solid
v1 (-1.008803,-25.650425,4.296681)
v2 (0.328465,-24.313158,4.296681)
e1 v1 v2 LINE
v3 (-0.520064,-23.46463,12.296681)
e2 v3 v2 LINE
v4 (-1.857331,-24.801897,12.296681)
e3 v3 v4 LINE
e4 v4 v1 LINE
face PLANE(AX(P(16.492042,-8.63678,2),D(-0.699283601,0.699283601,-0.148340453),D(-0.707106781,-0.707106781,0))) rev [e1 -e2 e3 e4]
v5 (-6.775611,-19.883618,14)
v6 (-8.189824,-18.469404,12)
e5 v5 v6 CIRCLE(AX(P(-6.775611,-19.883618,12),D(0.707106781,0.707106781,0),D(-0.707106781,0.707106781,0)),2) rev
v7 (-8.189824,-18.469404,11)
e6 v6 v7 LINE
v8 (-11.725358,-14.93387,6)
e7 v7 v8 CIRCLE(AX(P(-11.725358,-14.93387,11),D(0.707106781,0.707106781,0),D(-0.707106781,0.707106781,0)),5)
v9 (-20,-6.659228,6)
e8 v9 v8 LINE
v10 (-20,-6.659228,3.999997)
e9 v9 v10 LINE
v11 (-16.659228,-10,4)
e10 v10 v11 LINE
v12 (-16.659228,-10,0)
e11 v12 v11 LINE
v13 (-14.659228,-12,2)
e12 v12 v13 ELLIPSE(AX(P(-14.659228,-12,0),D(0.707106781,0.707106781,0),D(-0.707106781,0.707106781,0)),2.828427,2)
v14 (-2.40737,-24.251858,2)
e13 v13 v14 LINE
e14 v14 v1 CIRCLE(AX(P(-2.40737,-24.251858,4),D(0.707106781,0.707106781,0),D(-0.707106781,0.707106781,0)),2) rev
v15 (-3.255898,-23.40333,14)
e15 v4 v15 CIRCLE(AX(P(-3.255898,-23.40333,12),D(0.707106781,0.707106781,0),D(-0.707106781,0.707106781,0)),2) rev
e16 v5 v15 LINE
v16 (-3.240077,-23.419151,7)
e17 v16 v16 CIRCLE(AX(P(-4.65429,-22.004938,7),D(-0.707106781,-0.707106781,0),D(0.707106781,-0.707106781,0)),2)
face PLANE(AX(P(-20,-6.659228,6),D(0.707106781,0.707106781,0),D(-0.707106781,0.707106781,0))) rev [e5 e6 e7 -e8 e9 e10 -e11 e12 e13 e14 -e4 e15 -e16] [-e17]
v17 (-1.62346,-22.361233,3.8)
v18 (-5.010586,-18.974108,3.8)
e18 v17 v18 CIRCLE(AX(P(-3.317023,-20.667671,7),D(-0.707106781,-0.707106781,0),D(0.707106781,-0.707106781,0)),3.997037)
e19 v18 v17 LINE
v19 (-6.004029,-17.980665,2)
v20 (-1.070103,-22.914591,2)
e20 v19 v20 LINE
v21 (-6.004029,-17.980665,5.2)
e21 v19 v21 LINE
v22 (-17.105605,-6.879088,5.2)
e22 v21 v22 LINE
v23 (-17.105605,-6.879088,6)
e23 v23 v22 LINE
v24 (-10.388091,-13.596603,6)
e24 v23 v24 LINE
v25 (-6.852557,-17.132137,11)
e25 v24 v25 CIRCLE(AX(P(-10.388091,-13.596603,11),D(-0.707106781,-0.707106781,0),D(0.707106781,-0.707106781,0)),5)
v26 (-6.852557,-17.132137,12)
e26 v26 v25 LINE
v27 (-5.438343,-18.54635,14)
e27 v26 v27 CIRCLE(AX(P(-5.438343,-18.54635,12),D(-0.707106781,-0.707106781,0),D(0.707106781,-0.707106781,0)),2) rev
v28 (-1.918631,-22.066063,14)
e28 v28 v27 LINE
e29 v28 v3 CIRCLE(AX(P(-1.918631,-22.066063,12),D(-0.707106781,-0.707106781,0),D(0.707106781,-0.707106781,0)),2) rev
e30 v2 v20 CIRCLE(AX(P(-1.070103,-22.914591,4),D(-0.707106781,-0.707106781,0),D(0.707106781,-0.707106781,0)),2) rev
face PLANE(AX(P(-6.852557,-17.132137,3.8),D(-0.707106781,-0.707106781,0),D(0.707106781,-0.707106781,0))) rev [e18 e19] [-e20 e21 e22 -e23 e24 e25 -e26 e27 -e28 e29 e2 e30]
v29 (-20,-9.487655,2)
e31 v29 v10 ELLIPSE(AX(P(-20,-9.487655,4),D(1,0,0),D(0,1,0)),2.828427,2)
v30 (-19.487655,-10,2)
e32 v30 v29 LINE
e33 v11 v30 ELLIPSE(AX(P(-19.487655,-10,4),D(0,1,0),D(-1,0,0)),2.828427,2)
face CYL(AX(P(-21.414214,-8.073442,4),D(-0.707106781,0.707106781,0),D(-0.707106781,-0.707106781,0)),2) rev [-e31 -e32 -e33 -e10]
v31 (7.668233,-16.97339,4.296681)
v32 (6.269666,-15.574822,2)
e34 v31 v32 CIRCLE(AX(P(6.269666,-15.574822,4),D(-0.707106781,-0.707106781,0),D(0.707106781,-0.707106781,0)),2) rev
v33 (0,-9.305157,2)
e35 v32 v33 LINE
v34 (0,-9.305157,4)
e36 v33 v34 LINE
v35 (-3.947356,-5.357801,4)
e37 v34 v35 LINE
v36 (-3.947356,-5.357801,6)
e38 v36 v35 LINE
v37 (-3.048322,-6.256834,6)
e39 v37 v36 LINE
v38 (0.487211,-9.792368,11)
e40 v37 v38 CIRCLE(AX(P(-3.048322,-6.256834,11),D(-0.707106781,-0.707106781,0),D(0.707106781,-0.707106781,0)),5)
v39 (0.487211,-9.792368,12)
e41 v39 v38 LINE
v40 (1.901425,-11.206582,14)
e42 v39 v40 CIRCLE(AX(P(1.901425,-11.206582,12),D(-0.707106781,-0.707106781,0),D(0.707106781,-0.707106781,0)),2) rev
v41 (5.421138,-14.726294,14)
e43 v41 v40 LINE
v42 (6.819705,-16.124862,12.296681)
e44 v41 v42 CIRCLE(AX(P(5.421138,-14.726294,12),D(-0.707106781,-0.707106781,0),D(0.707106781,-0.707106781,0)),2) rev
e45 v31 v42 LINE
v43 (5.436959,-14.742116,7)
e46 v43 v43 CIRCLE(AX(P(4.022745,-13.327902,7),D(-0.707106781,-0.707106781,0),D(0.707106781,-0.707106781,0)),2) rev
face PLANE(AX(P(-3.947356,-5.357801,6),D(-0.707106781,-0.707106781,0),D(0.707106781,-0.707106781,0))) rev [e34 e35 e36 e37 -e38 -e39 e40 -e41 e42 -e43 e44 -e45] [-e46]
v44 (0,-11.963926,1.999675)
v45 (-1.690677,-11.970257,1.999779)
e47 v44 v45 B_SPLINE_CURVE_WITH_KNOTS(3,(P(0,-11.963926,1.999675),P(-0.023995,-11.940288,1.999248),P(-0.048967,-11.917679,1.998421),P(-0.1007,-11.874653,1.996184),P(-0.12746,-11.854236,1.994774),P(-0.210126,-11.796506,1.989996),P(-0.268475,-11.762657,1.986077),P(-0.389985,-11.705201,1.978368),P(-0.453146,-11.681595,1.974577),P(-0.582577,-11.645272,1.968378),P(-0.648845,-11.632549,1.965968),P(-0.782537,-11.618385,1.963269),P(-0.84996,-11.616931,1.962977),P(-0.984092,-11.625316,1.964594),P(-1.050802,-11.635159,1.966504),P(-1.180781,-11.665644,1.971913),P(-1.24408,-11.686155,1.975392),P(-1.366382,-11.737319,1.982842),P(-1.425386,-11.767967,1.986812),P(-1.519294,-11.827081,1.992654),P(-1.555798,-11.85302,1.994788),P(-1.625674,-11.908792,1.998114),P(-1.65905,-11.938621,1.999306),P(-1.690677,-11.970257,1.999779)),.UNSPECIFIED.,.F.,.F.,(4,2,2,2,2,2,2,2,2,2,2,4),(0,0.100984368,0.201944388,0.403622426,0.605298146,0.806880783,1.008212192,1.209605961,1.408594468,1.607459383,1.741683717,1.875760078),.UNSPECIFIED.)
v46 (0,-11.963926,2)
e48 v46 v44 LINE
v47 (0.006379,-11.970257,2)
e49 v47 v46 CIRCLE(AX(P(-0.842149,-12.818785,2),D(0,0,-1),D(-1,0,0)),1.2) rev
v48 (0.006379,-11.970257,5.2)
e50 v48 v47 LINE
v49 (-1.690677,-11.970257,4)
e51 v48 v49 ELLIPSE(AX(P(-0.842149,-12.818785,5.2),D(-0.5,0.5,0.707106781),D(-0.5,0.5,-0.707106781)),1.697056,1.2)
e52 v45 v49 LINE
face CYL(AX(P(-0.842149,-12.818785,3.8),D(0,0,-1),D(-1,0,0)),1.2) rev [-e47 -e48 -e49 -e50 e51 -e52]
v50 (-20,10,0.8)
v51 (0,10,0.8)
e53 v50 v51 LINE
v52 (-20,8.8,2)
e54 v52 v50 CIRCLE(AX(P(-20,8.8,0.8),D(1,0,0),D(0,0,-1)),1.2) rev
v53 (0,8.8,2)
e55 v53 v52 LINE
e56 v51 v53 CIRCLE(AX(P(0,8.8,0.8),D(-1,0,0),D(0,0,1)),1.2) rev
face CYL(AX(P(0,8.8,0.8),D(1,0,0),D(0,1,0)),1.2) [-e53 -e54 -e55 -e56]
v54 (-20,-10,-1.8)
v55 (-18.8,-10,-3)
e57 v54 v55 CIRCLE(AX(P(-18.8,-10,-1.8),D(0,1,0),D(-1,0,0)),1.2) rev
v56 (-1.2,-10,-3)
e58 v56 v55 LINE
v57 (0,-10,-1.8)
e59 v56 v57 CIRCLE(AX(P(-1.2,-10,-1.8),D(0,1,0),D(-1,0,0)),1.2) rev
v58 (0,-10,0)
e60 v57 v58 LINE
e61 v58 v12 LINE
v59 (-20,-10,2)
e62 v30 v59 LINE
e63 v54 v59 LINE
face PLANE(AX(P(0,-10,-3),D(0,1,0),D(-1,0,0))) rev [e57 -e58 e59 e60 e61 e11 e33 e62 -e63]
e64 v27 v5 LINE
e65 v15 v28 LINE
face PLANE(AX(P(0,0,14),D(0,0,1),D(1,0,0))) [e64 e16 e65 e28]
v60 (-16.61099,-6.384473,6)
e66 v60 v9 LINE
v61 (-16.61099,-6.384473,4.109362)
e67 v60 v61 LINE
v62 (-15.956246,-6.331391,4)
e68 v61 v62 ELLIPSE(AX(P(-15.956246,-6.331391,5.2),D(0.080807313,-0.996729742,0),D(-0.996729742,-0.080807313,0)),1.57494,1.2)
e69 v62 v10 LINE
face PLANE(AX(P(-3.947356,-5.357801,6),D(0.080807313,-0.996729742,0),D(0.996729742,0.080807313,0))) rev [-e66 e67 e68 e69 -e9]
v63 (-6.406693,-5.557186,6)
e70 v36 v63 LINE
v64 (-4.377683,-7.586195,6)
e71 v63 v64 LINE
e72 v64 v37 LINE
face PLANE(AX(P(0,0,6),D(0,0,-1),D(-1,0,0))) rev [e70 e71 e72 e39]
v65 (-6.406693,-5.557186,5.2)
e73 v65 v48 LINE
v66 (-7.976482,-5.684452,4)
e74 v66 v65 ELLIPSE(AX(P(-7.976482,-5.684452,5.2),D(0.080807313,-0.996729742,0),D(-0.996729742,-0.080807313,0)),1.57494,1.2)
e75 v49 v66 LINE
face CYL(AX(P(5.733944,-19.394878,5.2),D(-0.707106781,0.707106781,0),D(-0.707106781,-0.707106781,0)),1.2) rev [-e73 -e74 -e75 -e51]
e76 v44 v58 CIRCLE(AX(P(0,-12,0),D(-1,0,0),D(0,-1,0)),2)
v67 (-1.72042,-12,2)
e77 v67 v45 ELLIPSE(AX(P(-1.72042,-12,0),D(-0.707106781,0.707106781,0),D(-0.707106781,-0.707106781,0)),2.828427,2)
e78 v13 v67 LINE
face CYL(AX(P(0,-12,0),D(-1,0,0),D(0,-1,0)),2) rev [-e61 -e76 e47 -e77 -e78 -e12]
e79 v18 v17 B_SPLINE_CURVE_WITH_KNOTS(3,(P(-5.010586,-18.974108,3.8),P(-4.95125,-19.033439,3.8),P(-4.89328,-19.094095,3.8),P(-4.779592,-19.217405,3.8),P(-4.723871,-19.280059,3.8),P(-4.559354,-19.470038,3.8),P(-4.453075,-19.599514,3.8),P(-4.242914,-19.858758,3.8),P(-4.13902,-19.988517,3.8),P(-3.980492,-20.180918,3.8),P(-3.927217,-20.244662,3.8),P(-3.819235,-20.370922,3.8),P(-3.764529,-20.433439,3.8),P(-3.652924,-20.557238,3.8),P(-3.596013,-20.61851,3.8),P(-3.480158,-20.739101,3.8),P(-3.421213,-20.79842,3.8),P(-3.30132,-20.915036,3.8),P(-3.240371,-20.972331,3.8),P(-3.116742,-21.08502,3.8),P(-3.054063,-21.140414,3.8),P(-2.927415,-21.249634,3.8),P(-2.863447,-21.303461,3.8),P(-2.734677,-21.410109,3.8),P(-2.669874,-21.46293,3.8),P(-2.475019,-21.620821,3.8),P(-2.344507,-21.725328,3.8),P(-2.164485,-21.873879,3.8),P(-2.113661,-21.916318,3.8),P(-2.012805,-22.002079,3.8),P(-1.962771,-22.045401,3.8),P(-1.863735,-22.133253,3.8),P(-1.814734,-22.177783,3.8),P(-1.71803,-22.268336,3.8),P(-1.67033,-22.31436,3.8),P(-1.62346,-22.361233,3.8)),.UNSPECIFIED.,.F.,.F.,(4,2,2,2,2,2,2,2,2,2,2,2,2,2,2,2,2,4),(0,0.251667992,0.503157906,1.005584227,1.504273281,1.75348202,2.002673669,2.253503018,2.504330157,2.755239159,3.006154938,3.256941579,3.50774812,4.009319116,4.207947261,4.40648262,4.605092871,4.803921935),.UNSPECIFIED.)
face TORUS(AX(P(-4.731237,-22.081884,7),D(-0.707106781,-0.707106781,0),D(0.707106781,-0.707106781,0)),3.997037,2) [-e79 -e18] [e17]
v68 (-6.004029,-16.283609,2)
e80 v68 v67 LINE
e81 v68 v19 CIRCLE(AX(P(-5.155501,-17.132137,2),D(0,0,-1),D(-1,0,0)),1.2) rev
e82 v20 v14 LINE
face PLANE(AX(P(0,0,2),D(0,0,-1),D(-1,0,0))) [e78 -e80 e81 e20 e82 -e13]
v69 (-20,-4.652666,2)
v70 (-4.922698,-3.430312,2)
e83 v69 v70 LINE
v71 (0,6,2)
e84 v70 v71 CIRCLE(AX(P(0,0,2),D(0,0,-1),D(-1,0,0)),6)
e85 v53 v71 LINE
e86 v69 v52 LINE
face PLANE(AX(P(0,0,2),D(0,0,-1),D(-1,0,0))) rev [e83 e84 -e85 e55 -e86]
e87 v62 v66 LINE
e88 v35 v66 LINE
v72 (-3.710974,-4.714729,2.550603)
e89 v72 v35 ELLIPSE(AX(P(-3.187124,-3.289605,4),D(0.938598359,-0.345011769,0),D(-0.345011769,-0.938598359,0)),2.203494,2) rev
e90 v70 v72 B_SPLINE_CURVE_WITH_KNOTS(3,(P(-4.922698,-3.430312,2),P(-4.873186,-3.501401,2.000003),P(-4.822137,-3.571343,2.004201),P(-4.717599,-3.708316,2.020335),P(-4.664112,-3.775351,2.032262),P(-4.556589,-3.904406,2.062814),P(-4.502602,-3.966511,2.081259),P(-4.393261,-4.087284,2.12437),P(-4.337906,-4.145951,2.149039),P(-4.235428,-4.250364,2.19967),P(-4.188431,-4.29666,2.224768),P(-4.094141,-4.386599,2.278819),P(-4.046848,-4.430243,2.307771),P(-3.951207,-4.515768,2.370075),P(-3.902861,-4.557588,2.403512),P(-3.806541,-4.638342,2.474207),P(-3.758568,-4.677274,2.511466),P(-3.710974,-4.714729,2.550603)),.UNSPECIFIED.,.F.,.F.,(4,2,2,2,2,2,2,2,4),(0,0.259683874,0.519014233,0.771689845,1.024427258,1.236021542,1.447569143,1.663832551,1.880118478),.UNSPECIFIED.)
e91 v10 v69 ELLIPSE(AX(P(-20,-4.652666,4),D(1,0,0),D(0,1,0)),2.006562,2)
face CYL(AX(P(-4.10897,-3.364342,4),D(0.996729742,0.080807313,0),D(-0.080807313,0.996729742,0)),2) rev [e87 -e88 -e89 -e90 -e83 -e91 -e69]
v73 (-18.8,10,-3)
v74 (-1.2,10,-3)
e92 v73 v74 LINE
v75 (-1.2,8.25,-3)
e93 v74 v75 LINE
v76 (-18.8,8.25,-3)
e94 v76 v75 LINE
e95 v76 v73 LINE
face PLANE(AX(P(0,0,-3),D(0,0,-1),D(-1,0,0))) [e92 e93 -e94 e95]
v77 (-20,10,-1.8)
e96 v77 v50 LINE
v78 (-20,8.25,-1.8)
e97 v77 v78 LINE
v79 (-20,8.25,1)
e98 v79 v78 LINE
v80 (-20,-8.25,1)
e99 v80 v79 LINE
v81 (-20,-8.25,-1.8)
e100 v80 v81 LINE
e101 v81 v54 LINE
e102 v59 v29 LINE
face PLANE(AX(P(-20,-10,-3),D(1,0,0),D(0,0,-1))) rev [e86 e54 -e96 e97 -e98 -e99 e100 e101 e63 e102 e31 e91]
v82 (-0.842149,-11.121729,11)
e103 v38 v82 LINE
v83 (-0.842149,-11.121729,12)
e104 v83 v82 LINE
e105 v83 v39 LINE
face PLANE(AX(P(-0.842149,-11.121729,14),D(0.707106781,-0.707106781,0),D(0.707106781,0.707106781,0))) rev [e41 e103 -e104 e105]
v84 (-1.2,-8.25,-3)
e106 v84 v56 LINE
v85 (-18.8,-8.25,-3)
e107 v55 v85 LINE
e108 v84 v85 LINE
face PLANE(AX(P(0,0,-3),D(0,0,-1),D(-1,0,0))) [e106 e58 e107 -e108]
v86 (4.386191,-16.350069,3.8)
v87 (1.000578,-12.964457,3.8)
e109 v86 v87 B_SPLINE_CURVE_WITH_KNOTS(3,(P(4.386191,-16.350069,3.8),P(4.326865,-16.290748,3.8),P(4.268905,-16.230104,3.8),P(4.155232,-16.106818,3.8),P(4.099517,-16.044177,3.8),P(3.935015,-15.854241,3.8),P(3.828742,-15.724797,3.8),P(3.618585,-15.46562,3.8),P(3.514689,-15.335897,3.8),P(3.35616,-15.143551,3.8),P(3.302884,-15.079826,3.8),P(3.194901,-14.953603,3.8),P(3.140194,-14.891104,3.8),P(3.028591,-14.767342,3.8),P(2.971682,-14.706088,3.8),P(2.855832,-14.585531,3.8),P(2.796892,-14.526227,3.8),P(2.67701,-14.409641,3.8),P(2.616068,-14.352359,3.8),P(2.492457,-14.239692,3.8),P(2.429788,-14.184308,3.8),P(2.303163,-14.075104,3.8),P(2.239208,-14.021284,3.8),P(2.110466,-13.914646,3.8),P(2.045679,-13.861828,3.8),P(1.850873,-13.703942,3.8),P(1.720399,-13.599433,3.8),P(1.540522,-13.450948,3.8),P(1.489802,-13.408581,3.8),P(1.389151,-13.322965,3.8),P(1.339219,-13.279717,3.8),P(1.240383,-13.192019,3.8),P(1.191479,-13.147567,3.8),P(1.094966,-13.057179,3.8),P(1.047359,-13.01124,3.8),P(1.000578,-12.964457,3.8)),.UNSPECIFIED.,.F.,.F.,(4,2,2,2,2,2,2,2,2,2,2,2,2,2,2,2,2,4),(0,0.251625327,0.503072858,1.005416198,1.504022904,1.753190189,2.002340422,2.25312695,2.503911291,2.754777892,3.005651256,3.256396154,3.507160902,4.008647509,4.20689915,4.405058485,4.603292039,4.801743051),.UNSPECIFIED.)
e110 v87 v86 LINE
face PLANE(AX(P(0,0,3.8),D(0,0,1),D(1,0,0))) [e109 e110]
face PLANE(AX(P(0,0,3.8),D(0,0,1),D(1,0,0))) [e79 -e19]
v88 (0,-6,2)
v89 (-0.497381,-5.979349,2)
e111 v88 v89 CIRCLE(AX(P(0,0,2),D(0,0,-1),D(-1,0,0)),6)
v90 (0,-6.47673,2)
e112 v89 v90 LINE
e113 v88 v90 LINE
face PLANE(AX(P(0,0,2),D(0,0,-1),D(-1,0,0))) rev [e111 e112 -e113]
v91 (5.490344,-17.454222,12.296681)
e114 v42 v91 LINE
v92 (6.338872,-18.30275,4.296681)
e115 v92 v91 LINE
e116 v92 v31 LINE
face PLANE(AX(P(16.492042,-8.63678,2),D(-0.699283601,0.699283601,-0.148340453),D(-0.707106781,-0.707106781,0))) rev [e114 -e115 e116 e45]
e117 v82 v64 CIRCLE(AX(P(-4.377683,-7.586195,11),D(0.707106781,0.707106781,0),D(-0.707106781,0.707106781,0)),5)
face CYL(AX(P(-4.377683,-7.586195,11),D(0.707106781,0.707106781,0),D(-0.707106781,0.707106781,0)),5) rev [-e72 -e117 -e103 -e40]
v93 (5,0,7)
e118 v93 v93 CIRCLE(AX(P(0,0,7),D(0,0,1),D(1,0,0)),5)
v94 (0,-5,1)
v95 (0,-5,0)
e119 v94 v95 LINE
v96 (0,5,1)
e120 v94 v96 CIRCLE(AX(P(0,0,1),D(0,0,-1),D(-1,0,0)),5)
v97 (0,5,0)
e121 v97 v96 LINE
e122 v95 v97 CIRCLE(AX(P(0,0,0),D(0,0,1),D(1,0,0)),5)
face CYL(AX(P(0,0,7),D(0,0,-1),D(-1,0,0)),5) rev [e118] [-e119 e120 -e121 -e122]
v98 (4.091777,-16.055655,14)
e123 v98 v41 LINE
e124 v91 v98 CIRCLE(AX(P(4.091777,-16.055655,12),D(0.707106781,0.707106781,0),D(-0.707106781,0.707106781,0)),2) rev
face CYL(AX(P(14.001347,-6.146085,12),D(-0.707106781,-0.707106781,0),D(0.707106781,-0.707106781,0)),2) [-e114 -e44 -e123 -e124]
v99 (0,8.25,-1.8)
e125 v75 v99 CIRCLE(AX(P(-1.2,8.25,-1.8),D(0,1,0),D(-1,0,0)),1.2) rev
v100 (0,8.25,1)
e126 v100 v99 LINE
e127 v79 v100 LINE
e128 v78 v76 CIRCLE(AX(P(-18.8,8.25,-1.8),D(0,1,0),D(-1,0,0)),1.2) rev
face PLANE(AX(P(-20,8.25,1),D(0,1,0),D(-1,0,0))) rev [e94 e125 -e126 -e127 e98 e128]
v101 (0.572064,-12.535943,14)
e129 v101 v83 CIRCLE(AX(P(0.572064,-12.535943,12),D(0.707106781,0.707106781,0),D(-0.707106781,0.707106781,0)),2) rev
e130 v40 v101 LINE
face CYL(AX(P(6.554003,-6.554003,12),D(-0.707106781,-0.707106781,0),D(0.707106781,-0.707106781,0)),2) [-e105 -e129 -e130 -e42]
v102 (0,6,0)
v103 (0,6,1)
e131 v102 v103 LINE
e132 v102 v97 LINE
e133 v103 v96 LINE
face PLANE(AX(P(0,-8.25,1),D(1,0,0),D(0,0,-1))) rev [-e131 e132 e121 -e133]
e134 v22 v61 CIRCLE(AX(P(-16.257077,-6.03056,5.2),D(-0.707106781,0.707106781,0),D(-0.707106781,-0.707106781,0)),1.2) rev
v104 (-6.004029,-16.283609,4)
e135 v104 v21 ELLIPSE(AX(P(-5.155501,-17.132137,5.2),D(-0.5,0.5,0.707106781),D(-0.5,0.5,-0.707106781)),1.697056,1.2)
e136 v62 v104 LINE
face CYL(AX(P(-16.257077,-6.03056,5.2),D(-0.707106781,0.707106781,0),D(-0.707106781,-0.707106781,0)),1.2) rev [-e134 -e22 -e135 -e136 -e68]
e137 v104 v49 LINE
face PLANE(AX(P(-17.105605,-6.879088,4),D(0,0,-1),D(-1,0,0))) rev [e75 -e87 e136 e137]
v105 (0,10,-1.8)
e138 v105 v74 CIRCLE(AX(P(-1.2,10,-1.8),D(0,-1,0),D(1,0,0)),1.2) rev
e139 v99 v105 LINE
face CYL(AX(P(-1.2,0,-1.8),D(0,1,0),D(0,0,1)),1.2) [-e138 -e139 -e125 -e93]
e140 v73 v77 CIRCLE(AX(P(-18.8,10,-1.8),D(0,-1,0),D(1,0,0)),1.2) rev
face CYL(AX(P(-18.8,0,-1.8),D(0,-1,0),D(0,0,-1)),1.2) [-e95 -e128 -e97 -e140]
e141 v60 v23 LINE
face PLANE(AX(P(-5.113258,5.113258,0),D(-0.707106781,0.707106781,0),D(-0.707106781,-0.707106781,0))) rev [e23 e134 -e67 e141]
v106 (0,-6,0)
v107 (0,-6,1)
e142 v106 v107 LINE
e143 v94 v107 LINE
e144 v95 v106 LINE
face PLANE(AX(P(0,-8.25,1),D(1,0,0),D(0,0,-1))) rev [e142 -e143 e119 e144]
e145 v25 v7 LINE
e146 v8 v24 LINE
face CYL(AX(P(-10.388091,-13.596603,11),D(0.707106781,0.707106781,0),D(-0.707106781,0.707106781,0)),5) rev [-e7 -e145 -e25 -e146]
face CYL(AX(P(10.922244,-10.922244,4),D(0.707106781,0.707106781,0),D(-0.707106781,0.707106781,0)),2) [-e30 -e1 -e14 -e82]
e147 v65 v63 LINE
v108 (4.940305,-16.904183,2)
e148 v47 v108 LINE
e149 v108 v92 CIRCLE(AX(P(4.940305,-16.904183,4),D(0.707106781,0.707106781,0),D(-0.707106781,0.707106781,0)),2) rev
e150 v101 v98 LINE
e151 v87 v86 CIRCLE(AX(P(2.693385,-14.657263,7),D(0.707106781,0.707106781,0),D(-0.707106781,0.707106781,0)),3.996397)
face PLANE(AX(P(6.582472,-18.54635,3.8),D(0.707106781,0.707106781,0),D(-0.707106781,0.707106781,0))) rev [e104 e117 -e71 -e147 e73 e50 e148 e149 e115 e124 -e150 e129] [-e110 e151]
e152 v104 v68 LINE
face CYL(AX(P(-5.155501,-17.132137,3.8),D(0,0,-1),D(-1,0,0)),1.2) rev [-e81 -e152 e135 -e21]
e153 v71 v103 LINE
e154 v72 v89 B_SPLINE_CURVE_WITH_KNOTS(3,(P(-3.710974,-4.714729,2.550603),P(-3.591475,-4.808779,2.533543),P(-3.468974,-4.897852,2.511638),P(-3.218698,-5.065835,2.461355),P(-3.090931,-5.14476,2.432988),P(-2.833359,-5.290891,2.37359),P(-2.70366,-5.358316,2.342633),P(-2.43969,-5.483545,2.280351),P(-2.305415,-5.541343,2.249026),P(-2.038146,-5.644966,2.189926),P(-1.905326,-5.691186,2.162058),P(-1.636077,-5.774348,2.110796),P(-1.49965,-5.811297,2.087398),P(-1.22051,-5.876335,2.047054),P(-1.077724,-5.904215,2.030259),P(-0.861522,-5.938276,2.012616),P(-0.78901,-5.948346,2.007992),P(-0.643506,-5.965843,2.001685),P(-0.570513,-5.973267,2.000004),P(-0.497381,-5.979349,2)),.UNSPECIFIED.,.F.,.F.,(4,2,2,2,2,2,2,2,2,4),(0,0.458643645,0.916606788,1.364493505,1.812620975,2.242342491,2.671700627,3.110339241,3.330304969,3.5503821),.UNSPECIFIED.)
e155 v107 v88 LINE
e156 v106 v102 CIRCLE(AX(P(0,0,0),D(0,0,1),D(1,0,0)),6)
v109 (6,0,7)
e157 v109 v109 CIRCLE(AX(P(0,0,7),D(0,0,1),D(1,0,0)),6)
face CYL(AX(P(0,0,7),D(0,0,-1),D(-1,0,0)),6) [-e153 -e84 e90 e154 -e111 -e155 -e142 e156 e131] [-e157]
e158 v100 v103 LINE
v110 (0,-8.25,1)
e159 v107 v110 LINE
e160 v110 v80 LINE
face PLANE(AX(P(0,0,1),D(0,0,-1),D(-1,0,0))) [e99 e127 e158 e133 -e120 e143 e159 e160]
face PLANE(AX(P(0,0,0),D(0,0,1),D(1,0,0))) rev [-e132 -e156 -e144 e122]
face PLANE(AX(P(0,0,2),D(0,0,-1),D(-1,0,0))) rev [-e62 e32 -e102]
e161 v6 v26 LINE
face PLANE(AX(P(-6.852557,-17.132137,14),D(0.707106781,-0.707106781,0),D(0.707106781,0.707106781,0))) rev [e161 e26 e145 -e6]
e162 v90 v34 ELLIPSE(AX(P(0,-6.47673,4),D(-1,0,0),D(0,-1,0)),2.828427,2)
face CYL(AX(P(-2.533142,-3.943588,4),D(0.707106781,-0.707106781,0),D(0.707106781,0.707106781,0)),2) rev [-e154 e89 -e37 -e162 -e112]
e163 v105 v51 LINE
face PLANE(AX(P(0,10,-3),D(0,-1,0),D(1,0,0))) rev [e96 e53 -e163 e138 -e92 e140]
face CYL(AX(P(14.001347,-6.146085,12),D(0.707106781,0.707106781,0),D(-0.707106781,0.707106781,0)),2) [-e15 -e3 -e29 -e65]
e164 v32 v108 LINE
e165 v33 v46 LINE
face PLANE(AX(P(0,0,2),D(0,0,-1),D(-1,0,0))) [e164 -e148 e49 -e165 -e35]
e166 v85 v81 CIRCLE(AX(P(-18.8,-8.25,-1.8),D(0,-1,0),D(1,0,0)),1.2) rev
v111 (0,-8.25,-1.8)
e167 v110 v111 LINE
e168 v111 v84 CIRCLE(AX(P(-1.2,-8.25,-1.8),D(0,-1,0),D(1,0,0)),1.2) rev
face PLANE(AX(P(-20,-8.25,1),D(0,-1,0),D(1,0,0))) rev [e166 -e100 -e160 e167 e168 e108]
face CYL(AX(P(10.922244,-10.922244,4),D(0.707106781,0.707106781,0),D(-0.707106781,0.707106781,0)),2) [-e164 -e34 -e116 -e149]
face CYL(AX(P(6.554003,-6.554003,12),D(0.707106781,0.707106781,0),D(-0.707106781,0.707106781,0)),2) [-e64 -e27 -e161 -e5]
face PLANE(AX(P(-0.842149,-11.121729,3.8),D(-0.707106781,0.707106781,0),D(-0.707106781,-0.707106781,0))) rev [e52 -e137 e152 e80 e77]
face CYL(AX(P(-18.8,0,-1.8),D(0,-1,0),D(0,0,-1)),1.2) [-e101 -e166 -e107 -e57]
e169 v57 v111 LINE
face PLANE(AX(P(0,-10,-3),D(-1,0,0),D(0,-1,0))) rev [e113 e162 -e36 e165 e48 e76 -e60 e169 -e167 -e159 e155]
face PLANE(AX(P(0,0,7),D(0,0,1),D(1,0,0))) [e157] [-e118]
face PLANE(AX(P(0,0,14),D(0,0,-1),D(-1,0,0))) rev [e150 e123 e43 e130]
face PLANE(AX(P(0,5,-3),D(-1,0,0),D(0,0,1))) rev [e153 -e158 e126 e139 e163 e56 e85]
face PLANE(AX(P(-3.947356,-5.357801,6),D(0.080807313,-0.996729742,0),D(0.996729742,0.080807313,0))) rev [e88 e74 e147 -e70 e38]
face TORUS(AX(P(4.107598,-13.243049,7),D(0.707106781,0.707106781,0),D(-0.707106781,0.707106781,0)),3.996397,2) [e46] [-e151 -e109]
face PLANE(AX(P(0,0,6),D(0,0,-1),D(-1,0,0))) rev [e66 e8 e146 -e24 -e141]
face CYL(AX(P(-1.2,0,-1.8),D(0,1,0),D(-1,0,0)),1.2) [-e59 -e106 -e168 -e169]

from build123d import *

# Parameters (mm, degrees)
CROQUIS1_R                   = 6
CROQUIS1_R_2                 = 5
SALIENTE_EXTRUIR1_DEPTH      = 7
SALIENTE_EXTRUIR2_DEPTH      = 3
SALIENTE_EXTRUIR2_DEPTH_BACK = 2
CROQUIS4_W                   = 20
CROQUIS4_H                   = 16.5
CORTAR_EXTRUIR1_DEPTH        = 4
SALIENTE_EXTRUIR7_DEPTH      = 4
CORTAR_EXTRUIR4_DEPTH        = 4
CORTAR_EXTRUIR5_DEPTH        = 2.2
SALIENTE_EXTRUIR9_DEPTH      = 8
CORTAR_EXTRUIR6_REACH        = 36.518
CROQUIS13_R                  = 2
REDONDEO1_R                  = 2
CROQUIS14_W                  = 1.8
CROQUIS14_H                  = 8.5
CORTAR_EXTRUIR7_DEPTH        = 10.5
CROQUIS15_W                  = 2
CROQUIS15_H                  = 8.5
CORTAR_EXTRUIR8_DEPTH        = 14.5
REDONDEO2_R                  = 2
REDONDEO3_R                  = 2
REDONDEO4_R                  = 5
CORTAR_EXTRUIR9_REACH        = 36.518
REDONDEO5_R                  = 2
REDONDEO6_R                  = 1.2
REDONDEO7_R                  = 1.2


with BuildPart() as part:
    # Croquis1 → Saliente-Extruir1 (new body)
    with BuildSketch(Plane.XY):
        Circle(CROQUIS1_R)
        Circle(CROQUIS1_R_2, mode=Mode.SUBTRACT)
    extrude(amount=SALIENTE_EXTRUIR1_DEPTH)

    # Croquis2 → Saliente-Extruir2 (add, two sides: drawn at the far end of the back side and taken through both)
    with BuildSketch(Plane(origin=(0, 0, 0), x_dir=(-1, 0, 0), z_dir=(0, 0, -1)).offset(-SALIENTE_EXTRUIR2_DEPTH_BACK)):
        with BuildLine():
            Line((0, -10), (0, -5))
            ThreePointArc((0, -5), (5, 0), (0, 5))
            Line((0, 5), (0, 10))
            Line((0, 10), (20, 10))
            Line((20, 10), (20, -10))
            Line((20, -10), (0, -10))
        make_face()
    extrude(amount=SALIENTE_EXTRUIR2_DEPTH + SALIENTE_EXTRUIR2_DEPTH_BACK)

    # Croquis4 → Cortar-Extruir1 (cut)
    with BuildSketch(Plane(origin=(0, 0, -3), x_dir=(-1, 0, 0), z_dir=(0, 0, -1))):
        with Locations((10, 0)):
            Rectangle(CROQUIS4_W, CROQUIS4_H)
    extrude(amount=-CORTAR_EXTRUIR1_DEPTH, mode=Mode.SUBTRACT)

    # Croquis5 → Saliente-Extruir7 (add)
    with BuildSketch(Plane.XY.offset(2)):
        Polygon((-3.9473557, -5.357801084), (-20, -6.659228144), (0.707205479, -27.366433624), (16.75984978, -26.065006564), align=None)
    extrude(amount=SALIENTE_EXTRUIR7_DEPTH)

    # Croquis10 → Cortar-Extruir4 (cut)
    with BuildSketch(Plane.XY.offset(6)):
        Polygon((-0.765202985, -25.894025159), (7.911832695, -17.216989479), (16.75984978, -26.065006564), (0.707205479, -27.366433624), align=None)
    extrude(amount=-CORTAR_EXTRUIR4_DEPTH, mode=Mode.SUBTRACT)

    # Croquis11 → Cortar-Extruir5 (cut)
    with BuildSketch(Plane.XY.offset(6)):
        Polygon((0.572064306, -24.556757867), (6.582471946, -18.546350227), (-0.842149256, -11.121729025), (-6.852556896, -17.132136665), align=None)
    extrude(amount=-CORTAR_EXTRUIR5_DEPTH, mode=Mode.SUBTRACT)

    # Croquis12 → Saliente-Extruir9 (add)
    with BuildSketch(Plane.XY.offset(6)):
        Polygon((-6.852556896, -17.132136665), (-8.189824188, -18.469403956), (-0.765202985, -25.894025159), (0.572064306, -24.556757867), align=None)
        Polygon((-0.842149256, -11.121729025), (0.487211492, -9.792368276), (7.911832695, -17.216989479), (6.582471946, -18.546350227), align=None)
    extrude(amount=SALIENTE_EXTRUIR9_DEPTH)

    # Cortar-Extruir6: up to this face of the body (flat: up to its plane)
    cortar_extruir6_end = Plane(part.part.faces().sort_by_distance((3.21499462, -12.520151404, 7.335855075))[0])
    # Croquis13 → Cortar-Extruir6 (cut, up to the picked face)
    with BuildSketch(Plane(origin=(-13.329614072, -13.329614072, 0), x_dir=(0, 0, 1), z_dir=(-0.7071067811865488, -0.7071067811865462, 0)), mode=Mode.PRIVATE) as cortar_extruir6_sk1:
        with Locations(Location((7, -12.268760562, 0), (0, 0, 270))):
            Circle(CROQUIS13_R)
    cortar_extruir6_tool1 = split(extrude(cortar_extruir6_sk1.sketch, amount=-CORTAR_EXTRUIR6_REACH, mode=Mode.PRIVATE), bisect_by=cortar_extruir6_end, keep=Keep.BOTH, mode=Mode.PRIVATE)
    add(cortar_extruir6_tool1.solids().sort_by(Axis((-4.65429, -22.004938, 7), (0.7071067811865488, 0.7071067811865462, 0)))[0], mode=Mode.SUBTRACT)

    # Redondeo1
    # the kernel refuses this fillet: 2 mm, written as the material it takes off along each edge
    with BuildSketch(Plane(origin=(-3.31702299, -20.667670571, 7), x_dir=(0.7071067811865459, -0.7071067811865492, 0), z_dir=(0, 0, -1))) as redondeo1_piece_1_section:
        with BuildLine():
            CenterArc((3.997037442, 2), REDONDEO1_R, 183.11895941, 86.88104059)
            Line((2, 1.89118154), (1.960059251, 1.889005171))
            ThreePointArc((1.960059251, 1.889005171), (1.96, 0.94559077), (1.96, 0))
            Line((1.96, 0), (2, -0.04))
            Line((2, -0.04), (3.997037442, -0.04))
            Line((3.997037442, -0.04), (3.997037442, 0))
        make_face()
    redondeo1_piece_1 = revolve(axis=Axis((-3.31702299, -20.667670571, 7), (-0.7071067811865488, -0.7071067811865462, 0)), mode=Mode.PRIVATE)
    redondeo1_piece_1 = split(redondeo1_piece_1, bisect_by=Plane(origin=(-3.31702299, -20.667670571, 3.8), z_dir=(0, 0, 1)), keep=Keep.TOP, mode=Mode.PRIVATE)
    add(redondeo1_piece_1, mode=Mode.SUBTRACT)
    with BuildSketch(Plane(origin=(2.69338465, -14.657262931, 7), x_dir=(0.7071067811865458, -0.7071067811865493, 0), z_dir=(0, 0, -1))) as redondeo1_piece_2_section:
        with BuildLine():
            CenterArc((3.996396754, -2), REDONDEO1_R, 90, 86.560187232)
            Line((3.996396754, 0), (3.996396754, 0.04))
            Line((3.996396754, 0.04), (2, 0.04))
            Line((2, 0.04), (1.96, 0))
            ThreePointArc((1.96, 0), (1.96, -0.94), (1.960072065, -1.8776))
            Line((1.960072065, -1.8776), (2, -1.88))
        make_face()
    redondeo1_piece_2 = revolve(axis=Axis((2.69338465, -14.657262931, 7), (-0.7071067811865488, -0.7071067811865462, 0)), mode=Mode.PRIVATE)
    redondeo1_piece_2 = split(redondeo1_piece_2, bisect_by=Plane(origin=(2.69338465, -14.657262931, 3.8), z_dir=(0, 0, 1)), keep=Keep.TOP, mode=Mode.PRIVATE)
    add(redondeo1_piece_2, mode=Mode.SUBTRACT)

    # Croquis14 → Cortar-Extruir7 (cut)
    with BuildSketch(Plane(origin=(12.564411087, -12.564411087, 0), x_dir=(0, 0, -1), z_dir=(0.7071067811865477, -0.7071067811865474, 0))):
        with Locations((-2.9, -12.709739462)):
            Rectangle(CROQUIS14_W, CROQUIS14_H)
    extrude(amount=-CORTAR_EXTRUIR7_DEPTH, mode=Mode.SUBTRACT)

    # Croquis15 → Cortar-Extruir8 (cut)
    with BuildSketch(Plane(origin=(5.139789884, -5.139789884, 0), x_dir=(0, 0, -1), z_dir=(0.7071067811865476, -0.7071067811865476, 0))):
        with Locations((-5, -12.709739462)):
            Rectangle(CROQUIS15_W, CROQUIS15_H)
    extrude(amount=-CORTAR_EXTRUIR8_DEPTH, mode=Mode.SUBTRACT)

    # Redondeo2
    # the kernel refuses this fillet: 2 mm, written as the material it adds along each edge
    with BuildSketch(Plane(origin=(-21.659228144, -10, 2), x_dir=(0, -1, 0), z_dir=(1, 0, 0))) as redondeo2_piece_1_section:
        with BuildLine():
            CenterArc((REDONDEO2_R, REDONDEO2_R), REDONDEO2_R, 180, 90)
            Line((0, REDONDEO2_R), (0, 0))
            Line((0, 0), (REDONDEO2_R, 0))
        make_face()
    redondeo2_piece_1 = extrude(amount=21.659228144, mode=Mode.PRIVATE)
    redondeo2_piece_1 = split(redondeo2_piece_1, bisect_by=Plane(origin=(-19.159228144, -7.5, 2), z_dir=(0.7071067811865488, 0.7071067811865464, 0)), keep=Keep.TOP, mode=Mode.PRIVATE)
    redondeo2_piece_1 = split(redondeo2_piece_1, bisect_by=Plane(origin=(-10.689824188, -20.969403956, 2), z_dir=(-0.7071067811865477, 0.7071067811865474, 0)), keep=Keep.TOP, mode=Mode.PRIVATE)
    add(redondeo2_piece_1)
    with BuildSketch(Plane(origin=(-21.659228144, -10, 2), x_dir=(0, -1, 0), z_dir=(1, 0, 0))) as redondeo2_piece_2_section:
        with BuildLine():
            CenterArc((REDONDEO2_R, REDONDEO2_R), REDONDEO2_R, 180, 90)
            Line((0, REDONDEO2_R), (0, 0))
            Line((0, 0), (REDONDEO2_R, 0))
        make_face()
    redondeo2_piece_2 = extrude(amount=21.659228144, mode=Mode.PRIVATE)
    redondeo2_piece_2 = split(redondeo2_piece_2, bisect_by=Plane(origin=(-11.811553213, -0.152325068, 2), z_dir=(0.7071067811865476, 0.7071067811865476, 0)), keep=Keep.TOP, mode=Mode.PRIVATE)
    add(redondeo2_piece_2)
    with BuildSketch(Plane(origin=(3.535533906, -12.84069069, 2), x_dir=(0.7071067811865488, 0.7071067811865464, 0), z_dir=(-0.7071067811865464, 0.7071067811865488, 0))) as redondeo2_piece_3_section:
        with BuildLine():
            CenterArc((REDONDEO2_R, -REDONDEO2_R), REDONDEO2_R, 90, 90)
            Line((0, -REDONDEO2_R), (0, 0))
            Line((0, 0), (REDONDEO2_R, 0))
        make_face()
    redondeo2_piece_3 = extrude(amount=15.582403966, mode=Mode.PRIVATE)
    redondeo2_piece_3 = split(redondeo2_piece_3, bisect_by=Plane(origin=(0, -12.84069069, 2), z_dir=(-1, 0, 0)), keep=Keep.TOP, mode=Mode.PRIVATE)
    redondeo2_piece_3 = split(redondeo2_piece_3, bisect_by=Plane(origin=(2.883977199, -4.80396825, 2), z_dir=(0.0808073133091507, -0.9967297417634114, 0)), keep=Keep.TOP, mode=Mode.PRIVATE)
    add(redondeo2_piece_3)
    with BuildSketch(Plane(origin=(1.036293009, -4.953764518, 2), x_dir=(-0.08080731330915071, 0.9967297417634114, 0), z_dir=(-0.9967297417634114, -0.0808073133091507, 0))) as redondeo2_piece_4_section:
        with BuildLine():
            CenterArc((REDONDEO2_R, -REDONDEO2_R), REDONDEO2_R, 90, 90)
            Line((0, -REDONDEO2_R), (0, 0))
            Line((0, 0), (REDONDEO2_R, 0))
        make_face()
    redondeo2_piece_4 = extrude(amount=26.105312832, mode=Mode.PRIVATE)
    redondeo2_piece_4 = split(redondeo2_piece_4, bisect_by=Plane(origin=(-20, -4.953764518, 2), z_dir=(1, 0, 0)), keep=Keep.TOP, mode=Mode.PRIVATE)
    redondeo2_piece_4 = split(redondeo2_piece_4, bisect_by=Plane(origin=(-1.657549628, -7.647607155, 2), z_dir=(-0.7071067811865488, -0.7071067811865464, 0)), keep=Keep.TOP, mode=Mode.PRIVATE)
    add(redondeo2_piece_4)
    with BuildSketch(Plane(origin=(3.535533906, -12.84069069, 2), x_dir=(0.7071067811865488, 0.7071067811865464, 0), z_dir=(-0.7071067811865464, 0.7071067811865488, 0))) as redondeo2_piece_5a_section:
        with BuildLine():
            CenterArc((REDONDEO2_R, -REDONDEO2_R), REDONDEO2_R, 90, 90)
            Line((0, -REDONDEO2_R), (0, 0))
            Line((0, 0), (REDONDEO2_R, 0))
        make_face()
    redondeo2_piece_5a = extrude(amount=15.582403966, mode=Mode.PRIVATE)
    redondeo2_piece_5a = redondeo2_piece_5a - Plane(origin=(0, 0, 2), x_dir=(1, 0, 0), z_dir=(0, 0, -1)) * Cylinder(6, 40, mode=Mode.PRIVATE)
    redondeo2_piece_5a = split(redondeo2_piece_5a, bisect_by=Plane(origin=(2.883977199, -4.80396825, 2), z_dir=(-0.0808073133091507, 0.9967297417634114, 0)), keep=Keep.TOP, mode=Mode.PRIVATE)
    with BuildSketch(Plane(origin=(1.036293009, -4.953764518, 2), x_dir=(-0.08080731330915071, 0.9967297417634114, 0), z_dir=(-0.9967297417634114, -0.0808073133091507, 0))) as redondeo2_piece_5b_section:
        with BuildLine():
            CenterArc((REDONDEO2_R, -REDONDEO2_R), REDONDEO2_R, 90, 90)
            Line((0, -REDONDEO2_R), (0, 0))
            Line((0, 0), (REDONDEO2_R, 0))
        make_face()
    redondeo2_piece_5b = extrude(amount=26.105312832, mode=Mode.PRIVATE)
    redondeo2_piece_5b = redondeo2_piece_5b - Plane(origin=(0, 0, 2), x_dir=(1, 0, 0), z_dir=(0, 0, -1)) * Cylinder(6, 61, mode=Mode.PRIVATE)
    redondeo2_piece_5b = split(redondeo2_piece_5b, bisect_by=Plane(origin=(-1.657549628, -7.647607155, 2), z_dir=(0.7071067811865488, 0.7071067811865464, 0)), keep=Keep.TOP, mode=Mode.PRIVATE)
    redondeo2_piece_5 = redondeo2_piece_5a & redondeo2_piece_5b
    add(redondeo2_piece_5)

    # Redondeo3
    redondeo3_edges = [part.edges().sort_by_distance(p)[0] for p in [
        (-18.329614072, -8.329614072, 2),
    ]]
    fillet(redondeo3_edges, radius=REDONDEO3_R)

    # Redondeo4
    redondeo4_edges = [part.edges().sort_by_distance(p)[0] for p in [
        (-7.521190542, -17.800770311, 6),
        (-0.177468882, -10.457048651, 6),
    ]]
    fillet(redondeo4_edges, radius=REDONDEO4_R)

    # Cortar-Extruir9: up to this face of the body (flat: up to its plane)
    cortar_extruir9_end = Plane(part.part.faces().sort_by_distance((-3.497839057, -5.807317727, 5.793776651))[0])
    # Croquis16 → Cortar-Extruir9 (cut, up to the picked face)
    with BuildSketch(Plane(origin=(-13.329614072, -13.329614072, 0), x_dir=(0, 0, 1), z_dir=(-0.7071067811865488, -0.7071067811865462, 0)), mode=Mode.PRIVATE) as cortar_extruir9_sk1:
        Polygon((2, -17.768760562), (14, -15.968760562), (14, -17.768760562), align=None)
    cortar_extruir9_tool1 = split(extrude(cortar_extruir9_sk1.sketch, amount=-CORTAR_EXTRUIR9_REACH, mode=Mode.PRIVATE), bisect_by=cortar_extruir9_end, keep=Keep.BOTH, mode=Mode.PRIVATE)
    add(cortar_extruir9_tool1.solids().sort_by(Axis((-1.189467, -25.469761, 10), (0.7071067811865488, 0.7071067811865462, 0)))[0], mode=Mode.SUBTRACT)

    # Redondeo5
    redondeo5_edges = [part.edges().sort_by_distance(p)[0] for p in [
        (-7.521190542, -17.800770311, 14),
        (-0.177468882, -10.457048651, 14),
        (-0.09656934, -25.225391513, 2),
        (-1.369361546, -23.952599307, 14),
        (5.974360114, -16.608877647, 14),
        (7.24715232, -17.881669853, 2),
    ]]
    fillet(redondeo5_edges, radius=REDONDEO5_R)

    # Redondeo6
    # the kernel refuses this fillet: 1.2 mm, written as the material it adds along each edge
    with BuildSketch(Plane(origin=(-6.852556896, -17.132136665, 4), x_dir=(0.7071067811865482, -0.7071067811865468, 0), z_dir=(0, 0, -1))) as redondeo6_piece_1:
        with BuildLine():
            CenterArc((REDONDEO6_R, -REDONDEO6_R), REDONDEO6_R, 90, 90)
            Line((0, -REDONDEO6_R), (0, 0))
            Line((0, 0), (REDONDEO6_R, 0))
        make_face()
    extrude(amount=2)
    with BuildSketch(Plane(origin=(-0.842149256, -11.121729025, -1.2031583), x_dir=(-0.7071067811865542, -0.7071067811865409, -7.347476233374363e-14), z_dir=(0, 0, 1))) as redondeo6_piece_2_section:
        with BuildLine():
            CenterArc((REDONDEO6_R, REDONDEO6_R), REDONDEO6_R, 180, 90)
            Line((0, REDONDEO6_R), (0, 0))
            Line((0, 0), (REDONDEO6_R, 0))
        make_face()
    redondeo6_piece_2 = extrude(amount=5.2031583, mode=Mode.PRIVATE)
    redondeo6_piece_2 = redondeo6_piece_2 - Plane(origin=(-0.842149256, -12, 0), x_dir=(0, -1, 0), z_dir=(-1, 0, 0)) * Cylinder(2, 16, mode=Mode.PRIVATE)
    redondeo6_piece_2 = split(redondeo6_piece_2, bisect_by=Plane(origin=(0, -11.121729025, -1.2031583), z_dir=(-1, 0, 0)), keep=Keep.TOP, mode=Mode.PRIVATE)
    add(redondeo6_piece_2)
    with BuildSketch(Plane(origin=(-0.842149256, -11.121729025, -1.2031583), x_dir=(-0.7071067811865542, -0.7071067811865409, -7.347476233374363e-14), z_dir=(0, 0, 1))) as redondeo6_piece_3_section:
        with BuildLine():
            CenterArc((REDONDEO6_R, REDONDEO6_R), REDONDEO6_R, 180, 90)
            Line((0, REDONDEO6_R), (0, 0))
            Line((0, 0), (REDONDEO6_R, 0))
        make_face()
    redondeo6_piece_3 = extrude(amount=5.2031583, mode=Mode.PRIVATE)
    redondeo6_piece_3 = split(redondeo6_piece_3, bisect_by=Plane(origin=(-0.842149256, -11.121729025, 2), z_dir=(0, 0, 1)), keep=Keep.TOP, mode=Mode.PRIVATE)
    add(redondeo6_piece_3)
    with BuildSketch(Plane(origin=(-6.852556896, -17.132136665, 4), x_dir=(0, 0, 1), z_dir=(-0.7071067811865476, 0.7071067811865476, 0))) as redondeo6_piece_4_section:
        with BuildLine():
            CenterArc((REDONDEO6_R, REDONDEO6_R), REDONDEO6_R, 180, 90)
            Line((0, REDONDEO6_R), (0, 0))
            Line((0, 0), (REDONDEO6_R, 0))
        make_face()
    redondeo6_piece_4 = extrude(amount=17.5, mode=Mode.PRIVATE)
    redondeo6_piece_4 = split(redondeo6_piece_4, bisect_by=Plane(origin=(-7.781927379, -5.668679171, 4), z_dir=(0.08080731330903411, -0.9967297417634209, 0)), keep=Keep.TOP, mode=Mode.PRIVATE)
    add(redondeo6_piece_4)
    with BuildSketch(Plane(origin=(-0.842149256, -11.121729025, 4), x_dir=(0, 0, 1), z_dir=(-0.7071067811865476, 0.7071067811865476, 0))) as redondeo6_piece_5_section:
        with BuildLine():
            CenterArc((REDONDEO6_R, -REDONDEO6_R), REDONDEO6_R, 90, 90)
            Line((0, -REDONDEO6_R), (0, 0))
            Line((0, 0), (REDONDEO6_R, 0))
        make_face()
    redondeo6_piece_5 = extrude(amount=10.869452862, mode=Mode.PRIVATE)
    redondeo6_piece_5 = split(redondeo6_piece_5, bisect_by=Plane(origin=(-1.326670052, -5.145335701, 4), z_dir=(0.08080731330903411, -0.9967297417634209, 0)), keep=Keep.TOP, mode=Mode.PRIVATE)
    add(redondeo6_piece_5)
    with BuildSketch(Plane(origin=(-6.852556896, -17.132136665, 7), x_dir=(0.7071067811865482, -0.7071067811865468, 0), z_dir=(0, 0, -1))) as redondeo6_piece_6a_section:
        with BuildLine():
            CenterArc((REDONDEO6_R, -REDONDEO6_R), REDONDEO6_R, 90, 90)
            Line((0, -REDONDEO6_R), (0, 0))
            Line((0, 0), (REDONDEO6_R, 0))
        make_face()
    redondeo6_piece_6a = extrude(amount=5, mode=Mode.PRIVATE)
    redondeo6_piece_6a = split(redondeo6_piece_6a, bisect_by=Plane(origin=(-6.852556896, -17.132136665, 4), z_dir=(0, 0, 1)), keep=Keep.TOP, mode=Mode.PRIVATE)
    with BuildSketch(Plane(origin=(-4.731236553, -19.253457008, 4), x_dir=(0, 0, 1), z_dir=(-0.7071067811865476, 0.7071067811865476, 0))) as redondeo6_piece_6b_section:
        with BuildLine():
            CenterArc((REDONDEO6_R, REDONDEO6_R), REDONDEO6_R, 180, 90)
            Line((0, REDONDEO6_R), (0, 0))
            Line((0, 0), (REDONDEO6_R, 0))
        make_face()
    redondeo6_piece_6b = extrude(amount=17.5, mode=Mode.PRIVATE)
    redondeo6_piece_6b = split(redondeo6_piece_6b, bisect_by=Plane(origin=(-6.852556896, -17.132136665, 4), z_dir=(0.7071067811865476, -0.7071067811865476, 0)), keep=Keep.TOP, mode=Mode.PRIVATE)
    redondeo6_piece_6 = redondeo6_piece_6a & redondeo6_piece_6b
    add(redondeo6_piece_6)
    with BuildSketch(Plane(origin=(-0.842149256, -11.121729025, -1.2031583), x_dir=(-0.7071067811865542, -0.7071067811865409, -7.347476233374363e-14), z_dir=(0, 0, 1))) as redondeo6_piece_7a_section:
        with BuildLine():
            CenterArc((REDONDEO6_R, REDONDEO6_R), REDONDEO6_R, 180, 90)
            Line((0, REDONDEO6_R), (0, 0))
            Line((0, 0), (REDONDEO6_R, 0))
        make_face()
    redondeo6_piece_7a = extrude(amount=8.2031583, mode=Mode.PRIVATE)
    redondeo6_piece_7a = split(redondeo6_piece_7a, bisect_by=Plane(origin=(-0.842149256, -11.121729025, 4), z_dir=(0, 0, 1)), keep=Keep.TOP, mode=Mode.PRIVATE)
    with BuildSketch(Plane(origin=(1.279171087, -13.243049368, 4), x_dir=(0, 0, 1), z_dir=(-0.7071067811865476, 0.7071067811865476, 0))) as redondeo6_piece_7b_section:
        with BuildLine():
            CenterArc((REDONDEO6_R, -REDONDEO6_R), REDONDEO6_R, 90, 90)
            Line((0, -REDONDEO6_R), (0, 0))
            Line((0, 0), (REDONDEO6_R, 0))
        make_face()
    redondeo6_piece_7b = extrude(amount=13.869452862, mode=Mode.PRIVATE)
    redondeo6_piece_7b = split(redondeo6_piece_7b, bisect_by=Plane(origin=(-0.842149256, -11.121729025, 4), z_dir=(0.7071067811865476, -0.7071067811865476, 0)), keep=Keep.TOP, mode=Mode.PRIVATE)
    redondeo6_piece_7 = redondeo6_piece_7a & redondeo6_piece_7b
    add(redondeo6_piece_7)

    # Redondeo7
    redondeo7_edges = [part.edges().sort_by_distance(p)[0] for p in [
        (-10, 10, 2),
        (-20, -9.125, -3),
        (0, 9.125, -3),
        (-20, 9.125, -3),
        (0, -9.125, -3),
    ]]
    fillet(redondeo7_edges, radius=REDONDEO7_R)


solid = part.part
